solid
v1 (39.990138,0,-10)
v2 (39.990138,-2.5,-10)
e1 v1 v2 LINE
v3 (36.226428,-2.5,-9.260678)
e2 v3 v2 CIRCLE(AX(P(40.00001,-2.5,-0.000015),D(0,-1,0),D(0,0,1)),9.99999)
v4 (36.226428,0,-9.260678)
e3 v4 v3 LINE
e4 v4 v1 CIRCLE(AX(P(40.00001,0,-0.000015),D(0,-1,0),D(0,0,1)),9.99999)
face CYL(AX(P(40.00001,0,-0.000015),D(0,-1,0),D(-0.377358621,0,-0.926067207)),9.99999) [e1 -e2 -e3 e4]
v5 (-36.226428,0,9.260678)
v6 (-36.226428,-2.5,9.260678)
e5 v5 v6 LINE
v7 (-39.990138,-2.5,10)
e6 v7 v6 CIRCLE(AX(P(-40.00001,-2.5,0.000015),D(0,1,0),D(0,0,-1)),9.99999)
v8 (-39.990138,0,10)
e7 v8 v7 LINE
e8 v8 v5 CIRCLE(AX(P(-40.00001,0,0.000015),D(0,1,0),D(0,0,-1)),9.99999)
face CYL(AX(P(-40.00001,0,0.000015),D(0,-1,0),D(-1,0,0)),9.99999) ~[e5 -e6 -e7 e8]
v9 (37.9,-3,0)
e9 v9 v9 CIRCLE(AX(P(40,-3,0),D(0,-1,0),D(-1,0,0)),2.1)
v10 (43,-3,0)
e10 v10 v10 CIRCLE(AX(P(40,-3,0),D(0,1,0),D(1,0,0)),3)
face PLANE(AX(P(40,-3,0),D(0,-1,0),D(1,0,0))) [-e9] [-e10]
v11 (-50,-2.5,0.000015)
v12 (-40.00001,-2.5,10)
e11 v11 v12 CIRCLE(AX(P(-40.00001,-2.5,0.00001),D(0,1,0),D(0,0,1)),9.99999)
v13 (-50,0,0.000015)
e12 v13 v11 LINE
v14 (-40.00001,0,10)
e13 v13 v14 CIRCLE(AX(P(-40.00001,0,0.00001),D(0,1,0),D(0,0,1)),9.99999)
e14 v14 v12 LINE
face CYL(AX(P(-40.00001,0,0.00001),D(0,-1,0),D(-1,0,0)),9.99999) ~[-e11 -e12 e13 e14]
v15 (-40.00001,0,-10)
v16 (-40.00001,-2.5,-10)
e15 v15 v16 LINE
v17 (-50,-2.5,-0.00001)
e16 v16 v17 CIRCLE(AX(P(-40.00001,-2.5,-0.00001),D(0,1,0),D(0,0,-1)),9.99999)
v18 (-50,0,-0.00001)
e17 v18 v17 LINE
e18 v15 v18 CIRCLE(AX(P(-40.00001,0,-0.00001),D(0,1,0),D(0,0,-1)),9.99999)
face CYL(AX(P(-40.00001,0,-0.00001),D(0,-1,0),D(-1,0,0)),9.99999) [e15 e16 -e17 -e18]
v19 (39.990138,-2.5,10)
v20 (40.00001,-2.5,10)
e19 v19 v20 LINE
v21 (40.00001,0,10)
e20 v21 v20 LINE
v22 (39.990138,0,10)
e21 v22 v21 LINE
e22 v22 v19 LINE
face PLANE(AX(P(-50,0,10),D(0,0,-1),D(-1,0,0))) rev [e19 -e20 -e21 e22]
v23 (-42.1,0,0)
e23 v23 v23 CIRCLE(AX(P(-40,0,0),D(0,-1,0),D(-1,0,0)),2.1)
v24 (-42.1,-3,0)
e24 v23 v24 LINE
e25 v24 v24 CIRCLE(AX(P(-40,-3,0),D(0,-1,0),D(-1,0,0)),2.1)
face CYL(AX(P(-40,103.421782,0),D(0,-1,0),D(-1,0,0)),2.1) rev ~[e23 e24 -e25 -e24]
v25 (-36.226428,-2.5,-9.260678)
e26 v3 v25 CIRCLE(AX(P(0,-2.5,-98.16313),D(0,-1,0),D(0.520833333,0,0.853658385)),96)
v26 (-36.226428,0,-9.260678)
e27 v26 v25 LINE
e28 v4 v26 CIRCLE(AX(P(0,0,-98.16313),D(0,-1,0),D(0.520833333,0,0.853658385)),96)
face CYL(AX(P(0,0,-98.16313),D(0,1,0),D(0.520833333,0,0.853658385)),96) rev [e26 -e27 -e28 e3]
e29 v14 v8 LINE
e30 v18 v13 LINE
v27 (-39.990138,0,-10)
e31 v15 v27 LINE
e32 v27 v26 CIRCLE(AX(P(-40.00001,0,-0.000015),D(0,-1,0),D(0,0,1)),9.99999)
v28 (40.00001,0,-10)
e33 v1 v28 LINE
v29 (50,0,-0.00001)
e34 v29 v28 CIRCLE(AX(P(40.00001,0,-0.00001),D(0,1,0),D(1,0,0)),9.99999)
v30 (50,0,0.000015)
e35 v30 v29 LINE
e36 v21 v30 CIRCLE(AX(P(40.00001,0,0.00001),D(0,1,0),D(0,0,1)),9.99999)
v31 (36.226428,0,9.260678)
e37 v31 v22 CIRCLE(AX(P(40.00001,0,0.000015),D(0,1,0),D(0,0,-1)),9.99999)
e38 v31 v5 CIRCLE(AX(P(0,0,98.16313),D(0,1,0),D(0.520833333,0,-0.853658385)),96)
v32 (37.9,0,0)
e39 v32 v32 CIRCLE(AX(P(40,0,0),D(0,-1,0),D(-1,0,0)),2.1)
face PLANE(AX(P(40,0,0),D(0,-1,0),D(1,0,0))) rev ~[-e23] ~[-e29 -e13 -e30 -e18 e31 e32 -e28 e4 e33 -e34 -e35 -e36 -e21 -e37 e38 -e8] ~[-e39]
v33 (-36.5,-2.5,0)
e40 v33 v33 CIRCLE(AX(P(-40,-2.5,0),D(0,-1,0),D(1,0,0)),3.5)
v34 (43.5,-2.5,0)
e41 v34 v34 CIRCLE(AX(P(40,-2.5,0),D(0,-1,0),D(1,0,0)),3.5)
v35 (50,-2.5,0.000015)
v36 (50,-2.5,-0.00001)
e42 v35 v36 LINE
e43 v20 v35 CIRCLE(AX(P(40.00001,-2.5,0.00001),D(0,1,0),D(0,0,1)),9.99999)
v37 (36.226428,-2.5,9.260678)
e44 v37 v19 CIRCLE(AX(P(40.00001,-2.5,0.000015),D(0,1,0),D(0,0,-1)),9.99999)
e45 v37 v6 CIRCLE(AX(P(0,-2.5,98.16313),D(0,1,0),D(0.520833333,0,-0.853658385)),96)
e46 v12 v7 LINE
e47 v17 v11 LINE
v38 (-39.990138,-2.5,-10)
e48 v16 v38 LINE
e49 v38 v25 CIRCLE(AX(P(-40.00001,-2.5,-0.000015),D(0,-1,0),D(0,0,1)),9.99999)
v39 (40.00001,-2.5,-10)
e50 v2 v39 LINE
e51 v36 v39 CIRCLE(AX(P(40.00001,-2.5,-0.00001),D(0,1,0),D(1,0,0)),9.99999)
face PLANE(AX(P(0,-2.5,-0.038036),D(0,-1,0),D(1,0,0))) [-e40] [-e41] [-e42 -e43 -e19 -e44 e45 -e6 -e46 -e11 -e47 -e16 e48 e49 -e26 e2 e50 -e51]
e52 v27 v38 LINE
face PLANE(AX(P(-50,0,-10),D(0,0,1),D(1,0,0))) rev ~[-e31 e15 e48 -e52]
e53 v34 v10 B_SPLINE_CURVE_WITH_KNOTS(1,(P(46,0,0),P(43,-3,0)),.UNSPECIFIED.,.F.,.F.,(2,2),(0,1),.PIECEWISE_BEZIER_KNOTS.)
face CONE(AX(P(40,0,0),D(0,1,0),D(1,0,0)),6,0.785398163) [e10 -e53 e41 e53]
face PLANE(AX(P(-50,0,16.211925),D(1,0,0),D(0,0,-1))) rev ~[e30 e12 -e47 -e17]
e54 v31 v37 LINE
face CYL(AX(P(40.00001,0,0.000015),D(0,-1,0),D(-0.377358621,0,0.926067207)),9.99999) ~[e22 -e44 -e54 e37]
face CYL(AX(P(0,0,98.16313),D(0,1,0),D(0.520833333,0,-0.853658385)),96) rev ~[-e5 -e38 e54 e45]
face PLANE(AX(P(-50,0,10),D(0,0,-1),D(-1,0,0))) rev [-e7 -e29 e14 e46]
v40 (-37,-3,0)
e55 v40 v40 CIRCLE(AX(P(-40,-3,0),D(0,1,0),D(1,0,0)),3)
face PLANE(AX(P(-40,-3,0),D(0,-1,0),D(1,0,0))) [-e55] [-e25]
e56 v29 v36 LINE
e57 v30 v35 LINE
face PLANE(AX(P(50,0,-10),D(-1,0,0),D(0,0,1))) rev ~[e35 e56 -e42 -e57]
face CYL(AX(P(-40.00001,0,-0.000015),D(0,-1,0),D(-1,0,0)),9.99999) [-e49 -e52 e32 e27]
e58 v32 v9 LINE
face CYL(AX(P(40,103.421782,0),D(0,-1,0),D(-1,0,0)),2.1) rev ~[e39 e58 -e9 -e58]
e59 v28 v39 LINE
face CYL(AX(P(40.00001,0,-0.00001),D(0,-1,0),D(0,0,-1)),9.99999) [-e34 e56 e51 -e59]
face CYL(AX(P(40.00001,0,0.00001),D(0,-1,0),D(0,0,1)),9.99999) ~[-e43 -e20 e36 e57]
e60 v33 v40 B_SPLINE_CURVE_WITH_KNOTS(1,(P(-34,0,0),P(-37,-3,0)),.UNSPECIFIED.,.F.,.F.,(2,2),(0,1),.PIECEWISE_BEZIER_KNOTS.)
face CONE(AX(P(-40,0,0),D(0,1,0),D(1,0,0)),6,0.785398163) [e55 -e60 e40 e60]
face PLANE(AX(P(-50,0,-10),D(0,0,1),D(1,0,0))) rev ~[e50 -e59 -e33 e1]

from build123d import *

# Parameters (mm, degrees)
F0_R     = 6
F1_DEPTH = 2.5
F2_DEPTH = 3
F2_TAPER = 45
F3_D     = 4.2
F4_R     = 9.99999


# Not quite as in the source:
# - a fillet or chamfer is up to 0.001 mm smaller than in the source, because OpenCascade refuses the exact size


with BuildPart() as f1:
    # F0 (on Front) → F1 (new body)
    with BuildSketch(Plane.XZ):
        with BuildLine():
            Line((-50, 16.2119245403), (-50, -10))
            Line((-50, -10), (50, -10))
            Line((50, -10), (50, 16.2119245403))
            ThreePointArc((50, 16.2119245403), (0, 2.1631295345), (-50, 16.2119245403))
        make_face()
        with Locations((-40, 0)):
            Circle(F0_R, mode=Mode.SUBTRACT)
        with Locations((40, 0)):
            Circle(F0_R, mode=Mode.SUBTRACT)
        with Locations((-40, 0)):
            Circle(F0_R)
        with Locations((40, 0)):
            Circle(F0_R)
    extrude(amount=F1_DEPTH)

    # F0 (on Front) → F2 (join)
    with BuildSketch(Plane.XZ):
        with Locations((40, 0)):
            Circle(F0_R)
        with Locations((-40, 0)):
            Circle(F0_R)
    extrude(amount=F2_DEPTH, taper=F2_TAPER)

    # F3 (through all)
    with Locations(Plane(origin=(0, 0, 0), x_dir=(1, 0, 0), z_dir=(0, 1, 0))):
        with Locations((40, 0), (-40, 0)):
            Hole(F3_D / 2)

    # F4 (radius 10 in the source; OpenCascade refuses exactly that, so slightly less here)
    f4_edges = [f1.edges().sort_by_distance(p)[0] for p in [
        (-50, -1.25, 16.211925),
        (50, -1.25, 16.211925),
        (50, -1.25, -10),
        (-50, -1.25, -10),
    ]]
    fillet(f4_edges, radius=F4_R)


with BuildPart() as f5_1:
    # F5: instance of F1
    add(f1.part.mirror(Plane.XY))


with BuildPart() as f1_1:
    add(f1.part)

    # F6: intersect F5_1
    add(f5_1.part, mode=Mode.INTERSECT)


solid = f1_1.part
